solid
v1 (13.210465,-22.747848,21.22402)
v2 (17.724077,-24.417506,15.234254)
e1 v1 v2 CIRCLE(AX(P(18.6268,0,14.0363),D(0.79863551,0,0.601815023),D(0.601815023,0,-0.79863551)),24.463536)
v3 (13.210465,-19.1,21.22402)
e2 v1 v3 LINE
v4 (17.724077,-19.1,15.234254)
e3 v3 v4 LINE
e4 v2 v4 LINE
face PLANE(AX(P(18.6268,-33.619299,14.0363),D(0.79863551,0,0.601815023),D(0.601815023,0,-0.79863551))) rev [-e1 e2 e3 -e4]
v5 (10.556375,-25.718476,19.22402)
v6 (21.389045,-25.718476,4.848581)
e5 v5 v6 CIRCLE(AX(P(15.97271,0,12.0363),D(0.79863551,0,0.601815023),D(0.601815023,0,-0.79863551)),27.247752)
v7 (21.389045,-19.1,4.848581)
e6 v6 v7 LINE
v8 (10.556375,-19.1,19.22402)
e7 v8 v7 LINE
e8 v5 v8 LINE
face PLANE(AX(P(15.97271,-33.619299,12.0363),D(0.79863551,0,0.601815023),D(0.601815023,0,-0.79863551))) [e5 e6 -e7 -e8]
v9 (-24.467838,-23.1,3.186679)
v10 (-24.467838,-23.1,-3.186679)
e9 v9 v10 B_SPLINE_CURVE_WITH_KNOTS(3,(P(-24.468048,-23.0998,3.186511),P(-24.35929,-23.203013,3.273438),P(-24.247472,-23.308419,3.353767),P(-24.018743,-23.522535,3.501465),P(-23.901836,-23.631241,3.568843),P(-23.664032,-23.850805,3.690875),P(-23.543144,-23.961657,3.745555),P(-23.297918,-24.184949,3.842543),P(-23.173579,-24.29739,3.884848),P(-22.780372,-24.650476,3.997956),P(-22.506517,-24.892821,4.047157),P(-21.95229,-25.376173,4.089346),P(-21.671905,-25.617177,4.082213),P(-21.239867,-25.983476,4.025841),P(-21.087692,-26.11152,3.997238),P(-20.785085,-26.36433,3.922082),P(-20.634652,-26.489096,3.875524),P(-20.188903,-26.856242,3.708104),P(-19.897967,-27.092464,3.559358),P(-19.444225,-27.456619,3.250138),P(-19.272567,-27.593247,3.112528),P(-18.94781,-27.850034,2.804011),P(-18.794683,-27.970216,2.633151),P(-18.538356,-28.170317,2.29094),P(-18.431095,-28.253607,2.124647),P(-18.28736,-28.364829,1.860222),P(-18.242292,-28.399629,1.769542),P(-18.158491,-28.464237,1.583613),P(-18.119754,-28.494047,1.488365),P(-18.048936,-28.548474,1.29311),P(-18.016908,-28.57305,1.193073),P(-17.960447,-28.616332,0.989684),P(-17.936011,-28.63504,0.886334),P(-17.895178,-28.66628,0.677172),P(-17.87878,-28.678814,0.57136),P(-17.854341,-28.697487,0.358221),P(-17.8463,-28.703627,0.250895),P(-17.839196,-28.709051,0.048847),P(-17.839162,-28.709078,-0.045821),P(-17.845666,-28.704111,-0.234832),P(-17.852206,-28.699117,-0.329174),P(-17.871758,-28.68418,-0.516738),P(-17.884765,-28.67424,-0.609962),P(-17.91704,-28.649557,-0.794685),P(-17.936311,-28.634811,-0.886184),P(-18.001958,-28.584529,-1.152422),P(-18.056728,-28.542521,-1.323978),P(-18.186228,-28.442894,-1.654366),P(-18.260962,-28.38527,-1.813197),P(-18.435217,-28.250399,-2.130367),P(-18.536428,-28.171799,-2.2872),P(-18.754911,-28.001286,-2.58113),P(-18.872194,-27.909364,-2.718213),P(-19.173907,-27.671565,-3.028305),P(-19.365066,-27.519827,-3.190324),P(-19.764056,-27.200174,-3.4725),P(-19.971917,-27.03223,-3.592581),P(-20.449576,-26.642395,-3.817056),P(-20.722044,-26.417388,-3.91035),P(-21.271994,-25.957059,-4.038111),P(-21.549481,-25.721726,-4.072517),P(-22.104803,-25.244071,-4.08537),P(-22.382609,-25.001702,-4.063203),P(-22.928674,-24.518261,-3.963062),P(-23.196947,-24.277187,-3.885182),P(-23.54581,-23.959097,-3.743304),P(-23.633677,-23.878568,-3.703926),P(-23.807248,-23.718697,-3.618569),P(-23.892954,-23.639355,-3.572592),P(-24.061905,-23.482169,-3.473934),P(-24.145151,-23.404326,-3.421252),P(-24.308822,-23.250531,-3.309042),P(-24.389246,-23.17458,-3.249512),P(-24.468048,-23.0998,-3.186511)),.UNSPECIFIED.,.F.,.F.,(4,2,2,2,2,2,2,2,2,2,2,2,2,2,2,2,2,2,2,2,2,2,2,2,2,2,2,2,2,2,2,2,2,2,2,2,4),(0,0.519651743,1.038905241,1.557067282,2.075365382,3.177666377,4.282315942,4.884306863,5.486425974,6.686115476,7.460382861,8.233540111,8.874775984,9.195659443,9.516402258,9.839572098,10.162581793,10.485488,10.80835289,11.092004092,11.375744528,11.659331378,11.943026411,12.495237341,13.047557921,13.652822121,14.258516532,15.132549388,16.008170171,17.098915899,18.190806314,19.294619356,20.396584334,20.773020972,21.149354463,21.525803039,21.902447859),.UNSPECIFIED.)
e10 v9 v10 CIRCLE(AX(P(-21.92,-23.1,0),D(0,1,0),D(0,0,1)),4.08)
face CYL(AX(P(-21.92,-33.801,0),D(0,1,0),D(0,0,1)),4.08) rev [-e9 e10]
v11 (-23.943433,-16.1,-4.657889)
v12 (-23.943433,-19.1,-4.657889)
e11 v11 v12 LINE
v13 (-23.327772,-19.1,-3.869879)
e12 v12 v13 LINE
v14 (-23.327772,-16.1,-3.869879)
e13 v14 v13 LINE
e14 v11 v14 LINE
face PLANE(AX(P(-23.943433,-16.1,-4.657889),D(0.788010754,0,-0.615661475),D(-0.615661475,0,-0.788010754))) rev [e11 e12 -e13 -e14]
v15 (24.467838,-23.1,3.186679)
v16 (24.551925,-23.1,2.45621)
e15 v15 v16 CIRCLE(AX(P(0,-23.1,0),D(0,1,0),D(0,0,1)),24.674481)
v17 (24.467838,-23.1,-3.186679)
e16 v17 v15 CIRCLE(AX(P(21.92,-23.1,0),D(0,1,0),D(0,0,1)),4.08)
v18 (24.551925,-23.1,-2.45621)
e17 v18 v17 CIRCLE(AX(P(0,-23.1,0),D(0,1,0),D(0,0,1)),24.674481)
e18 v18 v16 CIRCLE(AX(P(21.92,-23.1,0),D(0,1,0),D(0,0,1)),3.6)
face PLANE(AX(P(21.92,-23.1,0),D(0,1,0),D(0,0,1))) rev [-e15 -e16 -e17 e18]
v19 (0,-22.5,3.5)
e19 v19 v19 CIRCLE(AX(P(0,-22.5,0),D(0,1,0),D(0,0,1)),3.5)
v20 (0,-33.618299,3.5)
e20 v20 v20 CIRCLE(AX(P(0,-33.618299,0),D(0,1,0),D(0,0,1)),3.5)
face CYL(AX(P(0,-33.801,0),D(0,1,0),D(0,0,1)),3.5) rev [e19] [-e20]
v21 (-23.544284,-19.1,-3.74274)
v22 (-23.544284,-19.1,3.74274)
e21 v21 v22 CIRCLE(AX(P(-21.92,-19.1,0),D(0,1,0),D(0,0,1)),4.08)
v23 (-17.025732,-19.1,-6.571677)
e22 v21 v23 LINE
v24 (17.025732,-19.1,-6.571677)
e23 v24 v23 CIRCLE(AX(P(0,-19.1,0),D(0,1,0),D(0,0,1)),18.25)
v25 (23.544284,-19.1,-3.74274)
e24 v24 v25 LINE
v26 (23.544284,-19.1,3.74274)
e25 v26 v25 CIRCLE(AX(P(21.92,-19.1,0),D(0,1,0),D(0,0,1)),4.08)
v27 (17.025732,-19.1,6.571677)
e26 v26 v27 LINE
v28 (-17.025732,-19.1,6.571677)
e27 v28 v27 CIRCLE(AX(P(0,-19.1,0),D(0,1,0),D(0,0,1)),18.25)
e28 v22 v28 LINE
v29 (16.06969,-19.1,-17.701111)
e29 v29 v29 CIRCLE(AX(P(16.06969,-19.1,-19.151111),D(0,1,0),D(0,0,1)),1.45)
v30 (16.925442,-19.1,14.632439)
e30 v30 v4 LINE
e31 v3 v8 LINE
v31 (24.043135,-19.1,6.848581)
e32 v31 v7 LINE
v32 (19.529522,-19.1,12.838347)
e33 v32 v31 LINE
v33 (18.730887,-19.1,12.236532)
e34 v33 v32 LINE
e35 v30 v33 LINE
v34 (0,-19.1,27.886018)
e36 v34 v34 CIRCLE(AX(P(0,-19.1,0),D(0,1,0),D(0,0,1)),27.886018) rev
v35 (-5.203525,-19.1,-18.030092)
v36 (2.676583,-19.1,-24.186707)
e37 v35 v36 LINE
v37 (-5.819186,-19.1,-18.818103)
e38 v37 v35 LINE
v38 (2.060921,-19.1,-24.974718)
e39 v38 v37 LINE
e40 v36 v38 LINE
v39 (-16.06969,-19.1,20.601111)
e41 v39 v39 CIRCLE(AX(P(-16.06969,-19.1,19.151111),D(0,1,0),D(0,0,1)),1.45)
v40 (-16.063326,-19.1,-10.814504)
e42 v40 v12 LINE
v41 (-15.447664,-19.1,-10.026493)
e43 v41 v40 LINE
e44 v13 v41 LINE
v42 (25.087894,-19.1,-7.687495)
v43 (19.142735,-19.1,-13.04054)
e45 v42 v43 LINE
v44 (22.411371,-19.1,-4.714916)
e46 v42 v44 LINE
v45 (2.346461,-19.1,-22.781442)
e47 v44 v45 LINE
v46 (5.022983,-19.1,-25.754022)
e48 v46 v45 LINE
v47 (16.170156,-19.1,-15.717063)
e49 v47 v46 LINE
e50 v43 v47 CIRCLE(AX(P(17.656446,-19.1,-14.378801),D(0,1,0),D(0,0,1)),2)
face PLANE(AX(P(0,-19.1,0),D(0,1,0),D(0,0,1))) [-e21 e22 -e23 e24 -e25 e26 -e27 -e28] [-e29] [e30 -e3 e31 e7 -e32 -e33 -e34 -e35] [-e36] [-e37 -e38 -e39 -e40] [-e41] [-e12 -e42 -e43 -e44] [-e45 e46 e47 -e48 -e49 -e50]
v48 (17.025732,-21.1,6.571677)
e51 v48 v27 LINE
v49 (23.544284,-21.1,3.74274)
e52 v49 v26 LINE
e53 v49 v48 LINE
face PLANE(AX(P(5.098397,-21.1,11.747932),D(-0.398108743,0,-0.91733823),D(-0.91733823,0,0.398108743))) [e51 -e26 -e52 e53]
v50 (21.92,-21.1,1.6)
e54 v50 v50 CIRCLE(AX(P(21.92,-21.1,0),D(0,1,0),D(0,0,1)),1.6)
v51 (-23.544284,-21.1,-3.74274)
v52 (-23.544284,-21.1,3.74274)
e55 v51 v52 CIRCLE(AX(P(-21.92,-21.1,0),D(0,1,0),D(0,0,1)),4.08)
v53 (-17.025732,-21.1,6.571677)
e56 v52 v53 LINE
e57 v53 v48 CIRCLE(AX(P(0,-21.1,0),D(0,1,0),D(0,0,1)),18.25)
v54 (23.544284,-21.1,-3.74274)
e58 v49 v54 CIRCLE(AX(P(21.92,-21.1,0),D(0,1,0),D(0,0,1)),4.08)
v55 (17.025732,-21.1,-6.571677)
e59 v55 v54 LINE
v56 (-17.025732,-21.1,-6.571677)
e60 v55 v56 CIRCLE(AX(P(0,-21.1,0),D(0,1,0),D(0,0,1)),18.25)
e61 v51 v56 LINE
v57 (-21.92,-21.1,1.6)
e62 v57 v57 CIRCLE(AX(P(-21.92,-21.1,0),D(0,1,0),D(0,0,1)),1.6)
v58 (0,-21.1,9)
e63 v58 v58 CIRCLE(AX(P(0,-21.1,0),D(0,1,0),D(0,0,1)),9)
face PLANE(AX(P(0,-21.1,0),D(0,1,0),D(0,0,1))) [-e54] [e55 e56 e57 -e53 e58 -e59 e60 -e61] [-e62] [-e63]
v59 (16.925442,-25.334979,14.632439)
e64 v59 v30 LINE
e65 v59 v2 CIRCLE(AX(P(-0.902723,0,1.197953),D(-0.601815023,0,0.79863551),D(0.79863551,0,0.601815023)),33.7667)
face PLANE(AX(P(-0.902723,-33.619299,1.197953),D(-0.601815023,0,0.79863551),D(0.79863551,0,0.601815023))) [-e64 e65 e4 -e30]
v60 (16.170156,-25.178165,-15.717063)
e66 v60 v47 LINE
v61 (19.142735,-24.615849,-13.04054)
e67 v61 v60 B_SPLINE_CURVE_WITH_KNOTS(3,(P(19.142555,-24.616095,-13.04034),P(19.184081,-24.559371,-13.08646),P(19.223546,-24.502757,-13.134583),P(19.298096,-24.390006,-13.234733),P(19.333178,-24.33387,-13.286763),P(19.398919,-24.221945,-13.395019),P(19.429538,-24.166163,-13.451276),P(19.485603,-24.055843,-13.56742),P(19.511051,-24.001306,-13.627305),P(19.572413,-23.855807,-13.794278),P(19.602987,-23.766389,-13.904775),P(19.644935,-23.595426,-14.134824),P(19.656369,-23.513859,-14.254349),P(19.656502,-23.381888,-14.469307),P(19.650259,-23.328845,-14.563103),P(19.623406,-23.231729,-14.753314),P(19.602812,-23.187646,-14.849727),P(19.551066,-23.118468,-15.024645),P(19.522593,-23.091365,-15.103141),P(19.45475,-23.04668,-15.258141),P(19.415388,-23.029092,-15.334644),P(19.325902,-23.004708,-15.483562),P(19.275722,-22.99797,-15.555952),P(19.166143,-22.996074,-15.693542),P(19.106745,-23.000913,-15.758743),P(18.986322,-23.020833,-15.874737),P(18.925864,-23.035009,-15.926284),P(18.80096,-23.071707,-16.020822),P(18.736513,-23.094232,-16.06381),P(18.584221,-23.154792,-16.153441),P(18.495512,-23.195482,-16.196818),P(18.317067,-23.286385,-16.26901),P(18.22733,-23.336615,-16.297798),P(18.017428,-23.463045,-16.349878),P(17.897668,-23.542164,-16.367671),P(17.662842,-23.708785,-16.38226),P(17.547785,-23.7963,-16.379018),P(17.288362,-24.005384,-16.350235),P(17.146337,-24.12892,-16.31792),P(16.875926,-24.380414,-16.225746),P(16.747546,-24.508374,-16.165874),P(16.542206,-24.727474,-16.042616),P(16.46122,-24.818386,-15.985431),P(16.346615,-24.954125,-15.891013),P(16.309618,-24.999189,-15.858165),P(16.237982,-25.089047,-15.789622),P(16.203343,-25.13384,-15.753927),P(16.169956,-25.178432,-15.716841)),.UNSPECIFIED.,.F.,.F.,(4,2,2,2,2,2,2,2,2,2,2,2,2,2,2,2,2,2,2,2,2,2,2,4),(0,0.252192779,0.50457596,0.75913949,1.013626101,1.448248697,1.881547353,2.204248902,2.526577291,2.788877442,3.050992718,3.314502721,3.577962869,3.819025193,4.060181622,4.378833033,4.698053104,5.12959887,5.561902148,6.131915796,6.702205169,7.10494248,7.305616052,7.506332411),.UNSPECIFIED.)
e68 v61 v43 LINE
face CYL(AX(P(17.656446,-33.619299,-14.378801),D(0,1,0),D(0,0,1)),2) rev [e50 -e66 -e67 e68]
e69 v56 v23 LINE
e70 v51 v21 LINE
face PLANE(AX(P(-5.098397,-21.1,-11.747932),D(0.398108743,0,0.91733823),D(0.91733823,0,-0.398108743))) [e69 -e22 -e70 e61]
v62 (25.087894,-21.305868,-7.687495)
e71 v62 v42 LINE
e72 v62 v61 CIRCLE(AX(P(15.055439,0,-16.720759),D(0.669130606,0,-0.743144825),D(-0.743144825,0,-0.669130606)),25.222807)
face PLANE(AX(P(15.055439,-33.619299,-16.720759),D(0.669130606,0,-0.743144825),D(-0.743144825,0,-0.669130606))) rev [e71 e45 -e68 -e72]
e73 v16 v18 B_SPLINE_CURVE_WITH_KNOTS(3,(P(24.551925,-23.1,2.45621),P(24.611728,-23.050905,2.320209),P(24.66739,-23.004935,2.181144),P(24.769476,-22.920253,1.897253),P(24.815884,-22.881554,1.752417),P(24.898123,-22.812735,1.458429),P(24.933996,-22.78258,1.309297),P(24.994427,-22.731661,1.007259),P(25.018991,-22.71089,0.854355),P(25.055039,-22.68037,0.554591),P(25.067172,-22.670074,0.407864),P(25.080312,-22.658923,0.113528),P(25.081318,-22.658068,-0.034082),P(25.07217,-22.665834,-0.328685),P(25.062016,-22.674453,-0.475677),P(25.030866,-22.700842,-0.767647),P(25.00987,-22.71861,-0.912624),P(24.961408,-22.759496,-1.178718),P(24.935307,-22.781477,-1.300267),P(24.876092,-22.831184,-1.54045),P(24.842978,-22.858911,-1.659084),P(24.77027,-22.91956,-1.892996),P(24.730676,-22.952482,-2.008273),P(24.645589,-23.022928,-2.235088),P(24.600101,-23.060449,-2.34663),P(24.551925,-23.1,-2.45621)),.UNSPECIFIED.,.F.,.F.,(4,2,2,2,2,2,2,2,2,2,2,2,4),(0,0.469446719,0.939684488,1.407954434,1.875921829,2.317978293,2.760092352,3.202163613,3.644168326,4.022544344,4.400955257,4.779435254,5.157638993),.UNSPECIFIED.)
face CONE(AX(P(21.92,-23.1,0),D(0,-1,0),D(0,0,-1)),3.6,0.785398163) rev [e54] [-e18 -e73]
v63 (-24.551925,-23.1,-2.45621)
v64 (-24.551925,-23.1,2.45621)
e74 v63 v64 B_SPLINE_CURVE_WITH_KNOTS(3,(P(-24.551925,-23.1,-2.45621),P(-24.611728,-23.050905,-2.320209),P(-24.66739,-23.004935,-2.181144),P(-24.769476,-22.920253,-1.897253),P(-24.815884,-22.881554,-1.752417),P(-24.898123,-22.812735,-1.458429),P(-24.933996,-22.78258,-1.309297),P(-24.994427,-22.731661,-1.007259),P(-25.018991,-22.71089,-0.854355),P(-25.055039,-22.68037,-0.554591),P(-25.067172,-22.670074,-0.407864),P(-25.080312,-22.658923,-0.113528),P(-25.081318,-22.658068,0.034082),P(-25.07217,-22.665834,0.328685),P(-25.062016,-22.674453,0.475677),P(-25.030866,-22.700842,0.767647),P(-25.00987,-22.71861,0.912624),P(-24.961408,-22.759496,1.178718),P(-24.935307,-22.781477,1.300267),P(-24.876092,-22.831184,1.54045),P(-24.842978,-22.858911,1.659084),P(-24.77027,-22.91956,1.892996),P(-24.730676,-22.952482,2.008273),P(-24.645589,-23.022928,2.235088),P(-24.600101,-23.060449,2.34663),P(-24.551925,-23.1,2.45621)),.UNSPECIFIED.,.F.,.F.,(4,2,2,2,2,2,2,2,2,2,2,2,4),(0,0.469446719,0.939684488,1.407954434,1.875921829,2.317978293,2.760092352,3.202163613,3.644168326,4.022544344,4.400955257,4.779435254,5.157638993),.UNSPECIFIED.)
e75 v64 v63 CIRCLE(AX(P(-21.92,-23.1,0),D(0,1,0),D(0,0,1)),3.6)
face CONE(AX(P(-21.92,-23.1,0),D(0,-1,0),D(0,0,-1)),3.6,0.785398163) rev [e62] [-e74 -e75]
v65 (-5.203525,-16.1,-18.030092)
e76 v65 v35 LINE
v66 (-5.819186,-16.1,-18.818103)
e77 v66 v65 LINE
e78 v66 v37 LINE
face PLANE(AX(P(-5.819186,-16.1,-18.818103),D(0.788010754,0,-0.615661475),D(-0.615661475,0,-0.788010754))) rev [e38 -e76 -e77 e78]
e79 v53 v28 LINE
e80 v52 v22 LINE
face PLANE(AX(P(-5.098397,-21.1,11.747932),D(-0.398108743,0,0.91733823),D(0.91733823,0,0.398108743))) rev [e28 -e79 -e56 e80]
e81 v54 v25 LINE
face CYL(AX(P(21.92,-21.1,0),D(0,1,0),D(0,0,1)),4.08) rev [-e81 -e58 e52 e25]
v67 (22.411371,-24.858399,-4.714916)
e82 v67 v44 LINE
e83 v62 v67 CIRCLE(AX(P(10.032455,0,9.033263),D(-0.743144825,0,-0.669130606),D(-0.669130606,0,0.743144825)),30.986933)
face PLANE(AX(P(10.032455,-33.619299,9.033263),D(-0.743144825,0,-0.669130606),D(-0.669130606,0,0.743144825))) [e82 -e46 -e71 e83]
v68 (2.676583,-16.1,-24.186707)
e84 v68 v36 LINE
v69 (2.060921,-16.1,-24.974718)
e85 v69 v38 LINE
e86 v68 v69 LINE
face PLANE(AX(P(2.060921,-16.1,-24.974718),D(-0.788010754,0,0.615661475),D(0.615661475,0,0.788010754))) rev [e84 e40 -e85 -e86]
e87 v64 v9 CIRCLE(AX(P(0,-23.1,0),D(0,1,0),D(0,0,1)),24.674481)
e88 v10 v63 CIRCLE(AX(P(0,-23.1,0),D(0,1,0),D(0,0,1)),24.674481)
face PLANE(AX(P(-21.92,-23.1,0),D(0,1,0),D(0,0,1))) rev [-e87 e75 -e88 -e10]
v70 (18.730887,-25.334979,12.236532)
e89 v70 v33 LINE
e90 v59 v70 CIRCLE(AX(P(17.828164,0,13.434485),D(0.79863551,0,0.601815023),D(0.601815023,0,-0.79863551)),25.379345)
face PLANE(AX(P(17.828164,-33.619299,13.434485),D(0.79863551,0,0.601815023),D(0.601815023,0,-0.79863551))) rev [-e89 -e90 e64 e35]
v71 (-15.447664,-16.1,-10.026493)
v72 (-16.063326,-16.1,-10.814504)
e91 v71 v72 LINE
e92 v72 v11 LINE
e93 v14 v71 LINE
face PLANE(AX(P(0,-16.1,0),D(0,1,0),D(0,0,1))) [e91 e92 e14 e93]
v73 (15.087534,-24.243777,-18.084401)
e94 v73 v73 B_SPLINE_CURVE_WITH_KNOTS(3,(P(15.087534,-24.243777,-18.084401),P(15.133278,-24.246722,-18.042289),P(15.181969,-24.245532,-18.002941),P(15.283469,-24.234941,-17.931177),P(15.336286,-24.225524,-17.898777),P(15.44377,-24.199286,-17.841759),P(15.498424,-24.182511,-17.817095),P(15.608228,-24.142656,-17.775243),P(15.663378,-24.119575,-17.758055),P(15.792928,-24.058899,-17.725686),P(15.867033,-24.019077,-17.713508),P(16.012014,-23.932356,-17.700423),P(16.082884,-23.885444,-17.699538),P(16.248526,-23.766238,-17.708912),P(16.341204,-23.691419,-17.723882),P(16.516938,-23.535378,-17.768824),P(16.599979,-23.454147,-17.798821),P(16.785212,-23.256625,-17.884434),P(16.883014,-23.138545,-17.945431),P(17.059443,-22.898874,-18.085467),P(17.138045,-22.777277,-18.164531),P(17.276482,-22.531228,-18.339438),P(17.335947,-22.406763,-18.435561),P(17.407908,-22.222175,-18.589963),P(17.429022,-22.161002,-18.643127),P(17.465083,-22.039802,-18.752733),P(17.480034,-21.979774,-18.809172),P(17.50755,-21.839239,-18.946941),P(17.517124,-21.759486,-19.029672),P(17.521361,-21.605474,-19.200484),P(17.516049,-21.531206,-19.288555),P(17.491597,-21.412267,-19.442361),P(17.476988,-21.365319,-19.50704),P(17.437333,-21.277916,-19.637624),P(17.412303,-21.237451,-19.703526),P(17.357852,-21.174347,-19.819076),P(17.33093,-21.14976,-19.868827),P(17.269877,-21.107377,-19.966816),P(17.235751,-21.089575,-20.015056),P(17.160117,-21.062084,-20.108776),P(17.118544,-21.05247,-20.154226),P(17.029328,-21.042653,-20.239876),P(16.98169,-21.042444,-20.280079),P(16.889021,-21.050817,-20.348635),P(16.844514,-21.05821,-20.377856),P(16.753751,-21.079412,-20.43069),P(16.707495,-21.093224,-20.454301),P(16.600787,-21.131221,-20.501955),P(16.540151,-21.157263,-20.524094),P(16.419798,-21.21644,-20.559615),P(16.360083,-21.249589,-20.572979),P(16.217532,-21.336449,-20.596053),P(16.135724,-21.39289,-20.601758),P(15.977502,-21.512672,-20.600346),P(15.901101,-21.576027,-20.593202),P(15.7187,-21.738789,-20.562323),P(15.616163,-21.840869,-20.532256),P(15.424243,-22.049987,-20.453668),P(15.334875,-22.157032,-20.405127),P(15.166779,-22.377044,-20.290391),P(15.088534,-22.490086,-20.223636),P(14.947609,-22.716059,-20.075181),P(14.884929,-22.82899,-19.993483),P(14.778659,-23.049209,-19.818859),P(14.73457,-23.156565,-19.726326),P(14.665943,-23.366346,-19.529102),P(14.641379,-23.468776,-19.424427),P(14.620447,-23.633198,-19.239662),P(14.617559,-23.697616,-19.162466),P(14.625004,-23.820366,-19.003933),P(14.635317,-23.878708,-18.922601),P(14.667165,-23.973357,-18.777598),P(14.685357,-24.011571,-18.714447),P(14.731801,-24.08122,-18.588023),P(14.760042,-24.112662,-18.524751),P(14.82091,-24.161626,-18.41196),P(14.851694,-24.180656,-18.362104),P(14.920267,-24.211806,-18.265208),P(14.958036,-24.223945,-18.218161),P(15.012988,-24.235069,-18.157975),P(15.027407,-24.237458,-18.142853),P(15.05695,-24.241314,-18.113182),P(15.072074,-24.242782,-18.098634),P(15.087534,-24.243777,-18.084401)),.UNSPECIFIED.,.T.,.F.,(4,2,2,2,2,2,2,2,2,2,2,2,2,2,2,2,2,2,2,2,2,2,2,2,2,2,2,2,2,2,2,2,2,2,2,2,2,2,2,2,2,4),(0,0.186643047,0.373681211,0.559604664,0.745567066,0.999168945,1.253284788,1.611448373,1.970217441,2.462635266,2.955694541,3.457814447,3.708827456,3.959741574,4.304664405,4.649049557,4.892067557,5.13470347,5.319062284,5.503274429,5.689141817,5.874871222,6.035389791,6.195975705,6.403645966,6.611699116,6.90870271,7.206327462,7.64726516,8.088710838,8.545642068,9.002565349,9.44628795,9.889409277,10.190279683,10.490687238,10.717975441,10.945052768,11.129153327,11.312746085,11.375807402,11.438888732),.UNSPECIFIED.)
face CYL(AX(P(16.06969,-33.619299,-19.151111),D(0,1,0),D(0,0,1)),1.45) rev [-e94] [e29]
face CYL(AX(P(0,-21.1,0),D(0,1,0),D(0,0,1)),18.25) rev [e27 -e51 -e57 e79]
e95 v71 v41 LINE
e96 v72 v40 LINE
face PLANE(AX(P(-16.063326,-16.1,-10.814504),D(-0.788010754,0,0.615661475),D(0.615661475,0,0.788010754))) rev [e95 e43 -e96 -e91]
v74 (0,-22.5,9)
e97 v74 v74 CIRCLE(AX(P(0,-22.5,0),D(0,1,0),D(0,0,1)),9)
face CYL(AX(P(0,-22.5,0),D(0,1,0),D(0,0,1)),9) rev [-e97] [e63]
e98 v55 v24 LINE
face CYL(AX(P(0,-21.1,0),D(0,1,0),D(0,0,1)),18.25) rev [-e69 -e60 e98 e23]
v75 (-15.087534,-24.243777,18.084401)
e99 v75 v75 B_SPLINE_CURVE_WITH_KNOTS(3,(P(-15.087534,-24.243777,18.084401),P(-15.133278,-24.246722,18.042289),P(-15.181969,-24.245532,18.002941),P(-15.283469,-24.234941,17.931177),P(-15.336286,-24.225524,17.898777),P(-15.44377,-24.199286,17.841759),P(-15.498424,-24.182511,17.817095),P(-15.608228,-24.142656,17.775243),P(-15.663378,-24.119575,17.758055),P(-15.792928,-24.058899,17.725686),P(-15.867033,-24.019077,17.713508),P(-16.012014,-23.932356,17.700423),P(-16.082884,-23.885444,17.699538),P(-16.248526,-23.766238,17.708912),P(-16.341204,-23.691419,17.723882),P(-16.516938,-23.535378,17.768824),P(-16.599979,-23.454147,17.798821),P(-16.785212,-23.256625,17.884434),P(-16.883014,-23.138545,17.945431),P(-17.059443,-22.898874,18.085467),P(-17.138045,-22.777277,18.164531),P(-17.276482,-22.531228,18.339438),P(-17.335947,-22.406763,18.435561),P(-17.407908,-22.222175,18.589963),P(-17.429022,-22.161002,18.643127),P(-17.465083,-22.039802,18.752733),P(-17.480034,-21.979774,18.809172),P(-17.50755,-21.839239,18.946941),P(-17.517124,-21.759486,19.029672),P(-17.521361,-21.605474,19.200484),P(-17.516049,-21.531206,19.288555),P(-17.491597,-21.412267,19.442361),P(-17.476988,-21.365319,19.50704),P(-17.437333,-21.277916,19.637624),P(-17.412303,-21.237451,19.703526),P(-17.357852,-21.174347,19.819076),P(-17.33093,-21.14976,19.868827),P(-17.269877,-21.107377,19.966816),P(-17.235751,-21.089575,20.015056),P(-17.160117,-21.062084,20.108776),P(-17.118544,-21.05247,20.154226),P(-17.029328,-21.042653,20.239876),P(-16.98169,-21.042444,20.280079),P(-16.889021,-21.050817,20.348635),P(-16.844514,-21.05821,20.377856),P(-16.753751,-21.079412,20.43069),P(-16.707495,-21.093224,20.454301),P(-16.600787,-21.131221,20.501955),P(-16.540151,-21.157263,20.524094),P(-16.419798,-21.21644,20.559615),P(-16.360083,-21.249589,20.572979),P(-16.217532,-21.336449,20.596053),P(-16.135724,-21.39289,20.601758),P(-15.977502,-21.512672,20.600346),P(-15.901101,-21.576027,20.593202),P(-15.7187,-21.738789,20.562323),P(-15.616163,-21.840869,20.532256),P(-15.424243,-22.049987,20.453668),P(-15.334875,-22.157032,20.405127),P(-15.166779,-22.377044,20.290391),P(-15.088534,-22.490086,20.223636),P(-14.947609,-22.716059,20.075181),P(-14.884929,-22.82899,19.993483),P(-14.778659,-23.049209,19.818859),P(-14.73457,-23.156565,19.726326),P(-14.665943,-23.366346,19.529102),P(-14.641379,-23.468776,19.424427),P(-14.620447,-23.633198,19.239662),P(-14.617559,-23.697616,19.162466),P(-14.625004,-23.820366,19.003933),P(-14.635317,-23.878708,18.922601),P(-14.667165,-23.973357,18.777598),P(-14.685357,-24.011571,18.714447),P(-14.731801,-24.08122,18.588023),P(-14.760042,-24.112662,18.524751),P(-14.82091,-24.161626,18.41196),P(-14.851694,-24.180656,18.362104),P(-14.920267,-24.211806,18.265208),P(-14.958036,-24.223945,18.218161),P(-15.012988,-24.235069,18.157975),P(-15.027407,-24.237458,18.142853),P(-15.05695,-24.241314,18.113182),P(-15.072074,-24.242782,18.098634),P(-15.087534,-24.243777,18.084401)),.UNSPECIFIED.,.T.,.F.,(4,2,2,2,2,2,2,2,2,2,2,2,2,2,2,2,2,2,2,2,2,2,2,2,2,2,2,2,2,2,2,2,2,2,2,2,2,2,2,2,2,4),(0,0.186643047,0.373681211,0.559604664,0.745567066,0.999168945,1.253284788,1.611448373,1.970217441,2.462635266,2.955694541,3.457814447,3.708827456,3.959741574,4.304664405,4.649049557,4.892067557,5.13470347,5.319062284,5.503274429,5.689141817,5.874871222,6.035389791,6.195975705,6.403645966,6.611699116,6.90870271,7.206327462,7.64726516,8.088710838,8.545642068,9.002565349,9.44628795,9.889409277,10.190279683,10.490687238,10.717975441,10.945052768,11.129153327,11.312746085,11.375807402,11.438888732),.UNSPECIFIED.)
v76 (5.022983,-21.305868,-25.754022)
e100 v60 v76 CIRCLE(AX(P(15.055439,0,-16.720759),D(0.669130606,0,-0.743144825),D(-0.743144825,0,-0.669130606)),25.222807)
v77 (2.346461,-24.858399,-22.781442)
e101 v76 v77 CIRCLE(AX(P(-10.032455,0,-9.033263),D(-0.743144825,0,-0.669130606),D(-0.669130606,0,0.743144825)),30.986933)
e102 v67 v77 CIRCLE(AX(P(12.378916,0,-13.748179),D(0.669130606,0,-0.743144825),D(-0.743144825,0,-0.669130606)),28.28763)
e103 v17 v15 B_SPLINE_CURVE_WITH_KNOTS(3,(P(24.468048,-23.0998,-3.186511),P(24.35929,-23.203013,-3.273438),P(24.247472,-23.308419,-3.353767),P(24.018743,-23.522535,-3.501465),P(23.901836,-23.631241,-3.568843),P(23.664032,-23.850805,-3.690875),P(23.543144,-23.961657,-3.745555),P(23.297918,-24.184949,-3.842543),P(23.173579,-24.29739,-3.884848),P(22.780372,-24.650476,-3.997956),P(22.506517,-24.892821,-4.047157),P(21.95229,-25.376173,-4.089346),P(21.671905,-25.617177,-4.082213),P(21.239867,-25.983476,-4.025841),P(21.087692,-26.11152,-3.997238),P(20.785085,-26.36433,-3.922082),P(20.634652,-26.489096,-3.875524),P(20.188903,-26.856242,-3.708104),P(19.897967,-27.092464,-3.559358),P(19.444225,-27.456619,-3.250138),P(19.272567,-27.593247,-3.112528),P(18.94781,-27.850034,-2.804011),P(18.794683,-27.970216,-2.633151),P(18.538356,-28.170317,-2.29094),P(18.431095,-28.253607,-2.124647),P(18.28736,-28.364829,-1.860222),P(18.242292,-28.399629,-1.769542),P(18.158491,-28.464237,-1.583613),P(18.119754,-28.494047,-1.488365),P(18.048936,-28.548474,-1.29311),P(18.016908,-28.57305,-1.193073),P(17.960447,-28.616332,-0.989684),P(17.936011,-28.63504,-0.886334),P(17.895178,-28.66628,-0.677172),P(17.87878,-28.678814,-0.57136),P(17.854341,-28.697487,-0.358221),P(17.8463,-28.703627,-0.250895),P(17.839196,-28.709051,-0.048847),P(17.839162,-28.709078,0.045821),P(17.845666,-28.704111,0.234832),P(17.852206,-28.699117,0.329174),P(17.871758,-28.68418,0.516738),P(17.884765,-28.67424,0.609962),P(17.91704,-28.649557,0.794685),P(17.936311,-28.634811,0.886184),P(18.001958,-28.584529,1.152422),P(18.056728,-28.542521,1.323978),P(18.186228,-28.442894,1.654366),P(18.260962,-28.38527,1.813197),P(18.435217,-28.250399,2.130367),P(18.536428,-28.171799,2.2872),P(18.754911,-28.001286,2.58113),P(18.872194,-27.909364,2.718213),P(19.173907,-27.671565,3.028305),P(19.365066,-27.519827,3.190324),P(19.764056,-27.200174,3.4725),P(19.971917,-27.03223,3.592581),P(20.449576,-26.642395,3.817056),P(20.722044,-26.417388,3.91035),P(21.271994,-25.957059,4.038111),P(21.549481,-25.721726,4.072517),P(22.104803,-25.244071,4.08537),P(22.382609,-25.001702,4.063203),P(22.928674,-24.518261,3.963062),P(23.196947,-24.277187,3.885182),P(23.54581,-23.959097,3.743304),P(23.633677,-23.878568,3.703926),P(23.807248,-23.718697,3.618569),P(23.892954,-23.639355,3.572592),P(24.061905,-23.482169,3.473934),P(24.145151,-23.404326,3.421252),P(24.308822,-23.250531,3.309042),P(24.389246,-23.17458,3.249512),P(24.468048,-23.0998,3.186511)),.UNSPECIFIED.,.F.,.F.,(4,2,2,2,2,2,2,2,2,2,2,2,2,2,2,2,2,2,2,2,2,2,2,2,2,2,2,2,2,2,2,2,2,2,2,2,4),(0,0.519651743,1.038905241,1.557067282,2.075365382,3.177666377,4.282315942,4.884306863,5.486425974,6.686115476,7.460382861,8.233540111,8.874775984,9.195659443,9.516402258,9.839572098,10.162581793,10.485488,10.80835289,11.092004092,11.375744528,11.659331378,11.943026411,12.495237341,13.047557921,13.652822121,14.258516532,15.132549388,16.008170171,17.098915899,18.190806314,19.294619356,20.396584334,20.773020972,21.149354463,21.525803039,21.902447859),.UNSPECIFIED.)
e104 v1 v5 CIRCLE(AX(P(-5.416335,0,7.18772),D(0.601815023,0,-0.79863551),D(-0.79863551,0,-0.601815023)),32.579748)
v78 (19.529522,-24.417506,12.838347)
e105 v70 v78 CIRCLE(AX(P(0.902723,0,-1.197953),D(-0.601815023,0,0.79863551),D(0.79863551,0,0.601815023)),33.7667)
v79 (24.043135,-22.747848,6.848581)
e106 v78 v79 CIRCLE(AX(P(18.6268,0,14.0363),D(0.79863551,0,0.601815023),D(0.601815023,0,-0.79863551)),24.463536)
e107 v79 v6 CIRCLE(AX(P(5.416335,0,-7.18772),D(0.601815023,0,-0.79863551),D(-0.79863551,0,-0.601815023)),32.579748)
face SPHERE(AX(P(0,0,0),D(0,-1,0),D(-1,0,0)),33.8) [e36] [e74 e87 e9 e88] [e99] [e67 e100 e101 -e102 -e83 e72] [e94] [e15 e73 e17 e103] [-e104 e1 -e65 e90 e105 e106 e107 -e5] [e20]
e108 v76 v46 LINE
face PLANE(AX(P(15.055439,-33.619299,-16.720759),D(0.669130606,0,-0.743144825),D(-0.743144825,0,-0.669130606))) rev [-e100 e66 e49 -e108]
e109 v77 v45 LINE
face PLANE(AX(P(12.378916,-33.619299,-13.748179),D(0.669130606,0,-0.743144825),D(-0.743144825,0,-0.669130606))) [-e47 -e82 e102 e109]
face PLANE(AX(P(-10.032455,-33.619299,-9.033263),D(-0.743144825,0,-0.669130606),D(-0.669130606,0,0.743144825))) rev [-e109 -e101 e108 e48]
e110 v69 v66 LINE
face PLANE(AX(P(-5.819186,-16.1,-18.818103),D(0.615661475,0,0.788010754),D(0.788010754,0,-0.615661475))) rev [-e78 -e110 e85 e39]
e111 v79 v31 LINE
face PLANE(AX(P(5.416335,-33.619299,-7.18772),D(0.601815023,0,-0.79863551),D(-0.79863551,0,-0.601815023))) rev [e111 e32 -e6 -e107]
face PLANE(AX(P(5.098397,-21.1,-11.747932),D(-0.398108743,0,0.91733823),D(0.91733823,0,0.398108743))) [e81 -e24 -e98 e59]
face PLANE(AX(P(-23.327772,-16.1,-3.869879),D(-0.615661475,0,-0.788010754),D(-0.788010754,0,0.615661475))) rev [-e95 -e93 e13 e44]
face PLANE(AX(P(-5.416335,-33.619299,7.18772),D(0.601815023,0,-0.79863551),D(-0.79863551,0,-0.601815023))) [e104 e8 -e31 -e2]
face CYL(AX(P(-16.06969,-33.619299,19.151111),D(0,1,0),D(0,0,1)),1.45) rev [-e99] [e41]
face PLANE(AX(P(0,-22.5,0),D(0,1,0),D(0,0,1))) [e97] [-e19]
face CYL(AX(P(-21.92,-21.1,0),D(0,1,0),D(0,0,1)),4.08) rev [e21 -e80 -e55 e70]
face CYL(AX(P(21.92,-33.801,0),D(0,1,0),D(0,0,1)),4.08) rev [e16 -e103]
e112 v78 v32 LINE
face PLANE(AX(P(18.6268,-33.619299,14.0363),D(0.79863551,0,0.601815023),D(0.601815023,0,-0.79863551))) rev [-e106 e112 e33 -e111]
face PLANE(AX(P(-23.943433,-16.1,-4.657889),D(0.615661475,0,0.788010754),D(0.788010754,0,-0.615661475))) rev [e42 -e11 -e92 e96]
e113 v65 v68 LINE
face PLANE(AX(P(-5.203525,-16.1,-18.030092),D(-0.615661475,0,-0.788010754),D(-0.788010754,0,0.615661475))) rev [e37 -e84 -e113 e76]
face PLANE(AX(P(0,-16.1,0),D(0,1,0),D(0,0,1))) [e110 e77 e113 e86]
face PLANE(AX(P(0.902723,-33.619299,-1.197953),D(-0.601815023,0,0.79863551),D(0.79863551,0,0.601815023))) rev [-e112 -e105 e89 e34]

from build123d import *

# Parameters (mm, degrees)
SKETCH2_R               = 33.8
CUT_EXTRUDE1_DEPTH      = 19.1
CUT_EXTRUDE2_START      = -19.1
CUT_EXTRUDE2_DEPTH      = 2
CUT_EXTRUDE3_REACH      = 43.431
CUT_EXTRUDE3_END_RADIUS = 33.8
SKETCH6_R               = 1.6
CUT_EXTRUDE4_REACH      = 45.431
CUT_EXTRUDE4_START      = -2
SKETCH7_R               = 4.08
SKETCH8_R               = 9
CUT_EXTRUDE5_DEPTH      = 1.4
CUT_EXTRUDE6_REACH      = 43.024
CUT_EXTRUDE6_END_RADIUS = 33.8
SKETCH9_R               = 3.5
CUT_EXTRUDE8_REACH      = 44.024
CUT_EXTRUDE8_END_RADIUS = 33.8
SKETCH11_R              = 2
CUT_EXTRUDE9_REACH      = 44.024
CUT_EXTRUDE9_END_RADIUS = 33.8
CUT_EXTRUDE7_REACH      = 44.024
CUT_EXTRUDE7_END_RADIUS = 33.8
SKETCH10_R              = 1.45
BOSS_EXTRUDE1_DEPTH     = 3
CHAMFER1_SIZE           = 2


with BuildPart() as part:
    # Sketch1 → Revolve1 (revolve)
    with BuildSketch(Plane.XY, mode=Mode.PRIVATE) as revolve1_sk:
        with BuildLine():
            Line((0, -33.8), (0, 0))
            Line((0, 0), (33.8, 0))
            ThreePointArc((33.8, 0), (23.900209204, -23.900209204), (0, -33.8))
        make_face()
    revolve(revolve1_sk.sketch.rotate(Axis((0, -33.8, 0), (0, 1, 0)), 180), axis=Axis((0, -33.8, 0), (0, 1, 0)))

    # Sketch2 → Cut-Extrude1 (cut)
    with BuildSketch(Plane(origin=(0, 0, 0), x_dir=(1, 0, 0), z_dir=(0, 1, 0))):
        Circle(SKETCH2_R)
    extrude(amount=-CUT_EXTRUDE1_DEPTH, mode=Mode.SUBTRACT)

    # Sketch5 → Cut-Extrude2 (cut)
    with BuildSketch(Plane(origin=(0, 0, 0), x_dir=(1, 0, 0), z_dir=(0, 1, 0)).offset(CUT_EXTRUDE2_START)):
        with BuildLine():
            Line((-17.025732229, 6.571677263), (-23.544283672, 3.742739979))
            ThreePointArc((-23.544283672, 3.742739979), (-26, 0), (-23.544283672, -3.742739979))
            Line((-23.544283672, -3.742739979), (-17.025732229, -6.571677263))
            ThreePointArc((-17.025732229, -6.571677263), (0, -18.25), (17.025732229, -6.571677263))
            Line((17.025732229, -6.571677263), (23.544283672, -3.742739979))
            ThreePointArc((23.544283672, -3.742739979), (26, 0), (23.544283672, 3.742739979))
            Line((23.544283672, 3.742739979), (17.025732229, 6.571677263))
            ThreePointArc((17.025732229, 6.571677263), (0, 18.25), (-17.025732229, 6.571677263))
        make_face()
    extrude(amount=-CUT_EXTRUDE2_DEPTH, mode=Mode.SUBTRACT)

    # Cut-Extrude3: up to this sphere (the profile starts inside it)
    cut_extrude3_end = Location((0, 0, 0)) * Sphere(CUT_EXTRUDE3_END_RADIUS, mode=Mode.PRIVATE)
    # Sketch6 → Cut-Extrude3 (cut, up to the surface)
    with BuildSketch(Plane(origin=(0, -21.1, 0), x_dir=(1, 0, 0), z_dir=(0, 1, 0)), mode=Mode.PRIVATE) as cut_extrude3_sk1:
        with Locations(Location((-21.92, 0, 0), (0, 0, 270))):
            Circle(SKETCH6_R)
    cut_extrude3_tool1 = extrude(cut_extrude3_sk1.sketch, amount=-CUT_EXTRUDE3_REACH, mode=Mode.PRIVATE) & cut_extrude3_end
    add(cut_extrude3_tool1.solids().sort_by_distance((-21.92, -21.1, 0))[0], mode=Mode.SUBTRACT)
    # Sketch6 → Cut-Extrude3 (cut, up to the surface)
    with BuildSketch(Plane(origin=(0, -21.1, 0), x_dir=(1, 0, 0), z_dir=(0, 1, 0)), mode=Mode.PRIVATE) as cut_extrude3_sk2:
        with Locations(Location((21.92, 0, 0), (0, 0, 270))):
            Circle(SKETCH6_R)
    cut_extrude3_tool2 = extrude(cut_extrude3_sk2.sketch, amount=-CUT_EXTRUDE3_REACH, mode=Mode.PRIVATE) & cut_extrude3_end
    add(cut_extrude3_tool2.solids().sort_by_distance((21.92, -21.1, 0))[0], mode=Mode.SUBTRACT)

    # Sketch7 → Cut-Extrude4 (cut, up to next)
    with BuildSketch(Plane(origin=(0, -21.1, 0), x_dir=(1, 0, 0), z_dir=(0, 1, 0)).offset(CUT_EXTRUDE4_START), mode=Mode.PRIVATE) as cut_extrude4_sk1:
        with Locations((-21.92, 0)):
            Circle(SKETCH7_R)
    cut_extrude4_tool1 = extrude(cut_extrude4_sk1.sketch, amount=-CUT_EXTRUDE4_REACH, mode=Mode.PRIVATE) & part.part
    # Sketch7 → Cut-Extrude4 (cut, up to next)
    with BuildSketch(Plane(origin=(0, -21.1, 0), x_dir=(1, 0, 0), z_dir=(0, 1, 0)).offset(CUT_EXTRUDE4_START), mode=Mode.PRIVATE) as cut_extrude4_sk2:
        with Locations((21.92, 0)):
            Circle(SKETCH7_R)
    cut_extrude4_tool2 = extrude(cut_extrude4_sk2.sketch, amount=-CUT_EXTRUDE4_REACH, mode=Mode.PRIVATE) & part.part
    add(cut_extrude4_tool1.solids().sort_by_distance((-21.92, -23.1, 0))[0], mode=Mode.SUBTRACT)
    add(cut_extrude4_tool2.solids().sort_by_distance((21.92, -23.1, 0))[0], mode=Mode.SUBTRACT)

    # Sketch8 → Cut-Extrude5 (cut)
    with BuildSketch(Plane(origin=(0, -21.1, 0), x_dir=(1, 0, 0), z_dir=(0, 1, 0))):
        with Locations(Location((0, 0, 0), (0, 0, 270))):
            Circle(SKETCH8_R)
    extrude(amount=-CUT_EXTRUDE5_DEPTH, mode=Mode.SUBTRACT)

    # Cut-Extrude6: up to this sphere (the profile starts inside it)
    cut_extrude6_end = Location((0, 0, 0)) * Sphere(CUT_EXTRUDE6_END_RADIUS, mode=Mode.PRIVATE)
    # Sketch9 → Cut-Extrude6 (cut, up to the surface)
    with BuildSketch(Plane(origin=(0, -22.5, 0), x_dir=(1, 0, 0), z_dir=(0, 1, 0)), mode=Mode.PRIVATE) as cut_extrude6_sk1:
        with Locations(Location((0, 0, 0), (0, 0, 270))):
            Circle(SKETCH9_R)
    cut_extrude6_tool1 = extrude(cut_extrude6_sk1.sketch, amount=-CUT_EXTRUDE6_REACH, mode=Mode.PRIVATE) & cut_extrude6_end
    add(cut_extrude6_tool1.solids().sort_by_distance((0, -22.5, 0))[0], mode=Mode.SUBTRACT)

    # Cut-Extrude8: up to this sphere (the profile starts inside it)
    cut_extrude8_end = Location((0, 0, 0)) * Sphere(CUT_EXTRUDE8_END_RADIUS, mode=Mode.PRIVATE)
    # Sketch11 → Cut-Extrude8 (cut, up to the surface)
    with BuildSketch(Plane(origin=(0, -19.1, 0), x_dir=(1, 0, 0), z_dir=(0, 1, 0)), mode=Mode.PRIVATE) as cut_extrude8_sk1:
        with BuildLine():
            ThreePointArc((16.170155881, 15.717062664), (16.31818432, 12.8925118), (19.142735183, 13.040540238))
            Line((19.142735183, 13.040540238), (16.170155881, 15.717062664))
        make_face()
    cut_extrude8_tool1 = extrude(cut_extrude8_sk1.sketch, amount=-CUT_EXTRUDE8_REACH, mode=Mode.PRIVATE) & cut_extrude8_end
    add(cut_extrude8_tool1.solids().sort_by_distance((17.08847, -19.1, -13.748001))[0], mode=Mode.SUBTRACT)
    # Sketch11 → Cut-Extrude8 (cut, up to the surface)
    with BuildSketch(Plane(origin=(0, -19.1, 0), x_dir=(1, 0, 0), z_dir=(0, 1, 0)), mode=Mode.PRIVATE) as cut_extrude8_sk2:
        with BuildLine():
            Line((16.170155881, 15.717062664), (19.142735183, 13.040540238))
            ThreePointArc((19.142735183, 13.040540238), (19.523606385, 13.662065552), (19.656445532, 14.378801451))
            ThreePointArc((19.656445532, 14.378801451), (18.373181431, 16.245962304), (16.170155881, 15.717062664))
        make_face()
    cut_extrude8_tool2 = extrude(cut_extrude8_sk2.sketch, amount=-CUT_EXTRUDE8_REACH, mode=Mode.PRIVATE) & cut_extrude8_end
    add(cut_extrude8_tool2.solids().sort_by_distance((18.224421, -19.1, -15.009602))[0], mode=Mode.SUBTRACT)
    # Sketch11 → Cut-Extrude8 (cut, up to the surface)
    with BuildSketch(Plane(origin=(0, -19.1, 0), x_dir=(1, 0, 0), z_dir=(0, 1, 0)), mode=Mode.PRIVATE) as cut_extrude8_sk3:
        with Locations((17.656445532, 14.378801451)):
            Circle(SKETCH11_R)
    cut_extrude8_tool3 = extrude(cut_extrude8_sk3.sketch, amount=-CUT_EXTRUDE8_REACH, mode=Mode.PRIVATE) & cut_extrude8_end
    add(cut_extrude8_tool3.solids().sort_by_distance((17.656446, -19.1, -14.378801))[0], mode=Mode.SUBTRACT)
    # Sketch11 → Cut-Extrude8 (cut, up to the surface)
    with BuildSketch(Plane(origin=(0, -19.1, 0), x_dir=(1, 0, 0), z_dir=(0, 1, 0)), mode=Mode.PRIVATE) as cut_extrude8_sk4:
        Polygon((25.087893787, 7.687495387), (5.022983499, 25.754021759), (2.346461074, 22.781442457), (22.411371362, 4.714916085), align=None)
    cut_extrude8_tool4 = extrude(cut_extrude8_sk4.sketch, amount=-CUT_EXTRUDE8_REACH, mode=Mode.PRIVATE) & cut_extrude8_end
    add(cut_extrude8_tool4.solids().sort_by_distance((13.717177, -19.1, -15.234469))[0], mode=Mode.SUBTRACT)
    # Sketch11 → Cut-Extrude8 (cut, up to the surface)
    with BuildSketch(Plane(origin=(0, -19.1, 0), x_dir=(1, 0, 0), z_dir=(0, 1, 0)), mode=Mode.PRIVATE) as cut_extrude8_sk5:
        with BuildLine():
            ThreePointArc((16.170155881, 15.717062664), (16.31818432, 12.8925118), (19.142735183, 13.040540238))
            Line((19.142735183, 13.040540238), (16.170155881, 15.717062664))
        make_face()
    cut_extrude8_tool5 = extrude(cut_extrude8_sk5.sketch, amount=-CUT_EXTRUDE8_REACH, mode=Mode.PRIVATE) & cut_extrude8_end
    add(cut_extrude8_tool5.solids().sort_by_distance((17.08847, -19.1, -13.748001))[0], mode=Mode.SUBTRACT)
    # Sketch11 → Cut-Extrude8 (cut, up to the surface)
    with BuildSketch(Plane(origin=(0, -19.1, 0), x_dir=(1, 0, 0), z_dir=(0, 1, 0)), mode=Mode.PRIVATE) as cut_extrude8_sk6:
        with BuildLine():
            Line((16.170155881, 15.717062664), (19.142735183, 13.040540238))
            ThreePointArc((19.142735183, 13.040540238), (19.523606385, 13.662065552), (19.656445532, 14.378801451))
            ThreePointArc((19.656445532, 14.378801451), (18.373181431, 16.245962304), (16.170155881, 15.717062664))
        make_face()
    cut_extrude8_tool6 = extrude(cut_extrude8_sk6.sketch, amount=-CUT_EXTRUDE8_REACH, mode=Mode.PRIVATE) & cut_extrude8_end
    add(cut_extrude8_tool6.solids().sort_by_distance((18.224421, -19.1, -15.009602))[0], mode=Mode.SUBTRACT)

    # Cut-Extrude9: up to this sphere (the profile starts inside it)
    cut_extrude9_end = Location((0, 0, 0)) * Sphere(CUT_EXTRUDE9_END_RADIUS, mode=Mode.PRIVATE)
    # Sketch13 → Cut-Extrude9 (cut, up to the surface)
    with BuildSketch(Plane(origin=(0, -19.1, 0), x_dir=(1, 0, 0), z_dir=(0, 1, 0)), mode=Mode.PRIVATE) as cut_extrude9_sk1:
        Polygon((10.556374993, -19.224020053), (13.210464636, -21.224020053), (17.724077309, -15.234253728), (16.925441799, -14.632438705), (18.730886869, -12.236532175), (19.529522379, -12.838347198), (24.043135053, -6.848580873), (21.389045409, -4.848580873), align=None)
    cut_extrude9_tool1 = extrude(cut_extrude9_sk1.sketch, amount=-CUT_EXTRUDE9_REACH, mode=Mode.PRIVATE) & cut_extrude9_end
    add(cut_extrude9_tool1.solids().sort_by_distance((17.250772, -19.1, 12.999389))[0], mode=Mode.SUBTRACT)

    # Cut-Extrude7: up to this sphere (the profile starts inside it)
    cut_extrude7_end = Location((0, 0, 0)) * Sphere(CUT_EXTRUDE7_END_RADIUS, mode=Mode.PRIVATE)
    # Sketch10 → Cut-Extrude7 (cut, up to the surface)
    with BuildSketch(Plane(origin=(0, -19.1, 0), x_dir=(1, 0, 0), z_dir=(0, 1, 0)), mode=Mode.PRIVATE) as cut_extrude7_sk1:
        with Locations(Location((-16.069690242, -19.151111078, 0), (0, 0, 270))):
            Circle(SKETCH10_R)
    cut_extrude7_tool1 = extrude(cut_extrude7_sk1.sketch, amount=-CUT_EXTRUDE7_REACH, mode=Mode.PRIVATE) & cut_extrude7_end
    add(cut_extrude7_tool1.solids().sort_by_distance((-16.06969, -19.1, 19.151111))[0], mode=Mode.SUBTRACT)
    # Sketch10 → Cut-Extrude7 (cut, up to the surface)
    with BuildSketch(Plane(origin=(0, -19.1, 0), x_dir=(1, 0, 0), z_dir=(0, 1, 0)), mode=Mode.PRIVATE) as cut_extrude7_sk2:
        with Locations(Location((16.069690242, 19.151111078, 0), (0, 0, 270))):
            Circle(SKETCH10_R)
    cut_extrude7_tool2 = extrude(cut_extrude7_sk2.sketch, amount=-CUT_EXTRUDE7_REACH, mode=Mode.PRIVATE) & cut_extrude7_end
    add(cut_extrude7_tool2.solids().sort_by_distance((16.06969, -19.1, -19.151111))[0], mode=Mode.SUBTRACT)

    # Sketch14 → Boss-Extrude1 (add)
    with BuildSketch(Plane(origin=(0, -19.1, 0), x_dir=(1, 0, 0), z_dir=(0, 1, 0))):
        Polygon((-5.819186048, 18.818103207), (2.060921488, 24.97471796), (2.676582963, 24.186707207), (-5.203524573, 18.030092453), align=None)
        Polygon((-23.943433381, 4.657889274), (-16.063325845, 10.814504028), (-15.44766437, 10.026493274), (-23.327771906, 3.869878521), align=None)
    extrude(amount=BOSS_EXTRUDE1_DEPTH)

    # Chamfer1
    # the kernel refuses this chamfer: 2 mm, written as the material it takes off along each edge
    with BuildSketch(Plane(origin=(-21.92, -23.1, 0), x_dir=(0, 0, 1), z_dir=(-1, 0, 0))) as chamfer1_piece_1:
        Polygon((1.6 + CHAMFER1_SIZE, 0), (1.6, CHAMFER1_SIZE), (1.6, 0), align=None)
    revolve(axis=Axis((-21.92, -23.1, 0), (0, 1, 0)), mode=Mode.SUBTRACT)
    with BuildSketch(Plane(origin=(21.92, -23.1, 0), x_dir=(0, 0, 1), z_dir=(-1, 0, 0))) as chamfer1_piece_2:
        Polygon((1.6 + CHAMFER1_SIZE, 0), (1.6, CHAMFER1_SIZE), (1.6, 0), align=None)
    revolve(axis=Axis((21.92, -23.1, 0), (0, 1, 0)), mode=Mode.SUBTRACT)


solid = part.part
